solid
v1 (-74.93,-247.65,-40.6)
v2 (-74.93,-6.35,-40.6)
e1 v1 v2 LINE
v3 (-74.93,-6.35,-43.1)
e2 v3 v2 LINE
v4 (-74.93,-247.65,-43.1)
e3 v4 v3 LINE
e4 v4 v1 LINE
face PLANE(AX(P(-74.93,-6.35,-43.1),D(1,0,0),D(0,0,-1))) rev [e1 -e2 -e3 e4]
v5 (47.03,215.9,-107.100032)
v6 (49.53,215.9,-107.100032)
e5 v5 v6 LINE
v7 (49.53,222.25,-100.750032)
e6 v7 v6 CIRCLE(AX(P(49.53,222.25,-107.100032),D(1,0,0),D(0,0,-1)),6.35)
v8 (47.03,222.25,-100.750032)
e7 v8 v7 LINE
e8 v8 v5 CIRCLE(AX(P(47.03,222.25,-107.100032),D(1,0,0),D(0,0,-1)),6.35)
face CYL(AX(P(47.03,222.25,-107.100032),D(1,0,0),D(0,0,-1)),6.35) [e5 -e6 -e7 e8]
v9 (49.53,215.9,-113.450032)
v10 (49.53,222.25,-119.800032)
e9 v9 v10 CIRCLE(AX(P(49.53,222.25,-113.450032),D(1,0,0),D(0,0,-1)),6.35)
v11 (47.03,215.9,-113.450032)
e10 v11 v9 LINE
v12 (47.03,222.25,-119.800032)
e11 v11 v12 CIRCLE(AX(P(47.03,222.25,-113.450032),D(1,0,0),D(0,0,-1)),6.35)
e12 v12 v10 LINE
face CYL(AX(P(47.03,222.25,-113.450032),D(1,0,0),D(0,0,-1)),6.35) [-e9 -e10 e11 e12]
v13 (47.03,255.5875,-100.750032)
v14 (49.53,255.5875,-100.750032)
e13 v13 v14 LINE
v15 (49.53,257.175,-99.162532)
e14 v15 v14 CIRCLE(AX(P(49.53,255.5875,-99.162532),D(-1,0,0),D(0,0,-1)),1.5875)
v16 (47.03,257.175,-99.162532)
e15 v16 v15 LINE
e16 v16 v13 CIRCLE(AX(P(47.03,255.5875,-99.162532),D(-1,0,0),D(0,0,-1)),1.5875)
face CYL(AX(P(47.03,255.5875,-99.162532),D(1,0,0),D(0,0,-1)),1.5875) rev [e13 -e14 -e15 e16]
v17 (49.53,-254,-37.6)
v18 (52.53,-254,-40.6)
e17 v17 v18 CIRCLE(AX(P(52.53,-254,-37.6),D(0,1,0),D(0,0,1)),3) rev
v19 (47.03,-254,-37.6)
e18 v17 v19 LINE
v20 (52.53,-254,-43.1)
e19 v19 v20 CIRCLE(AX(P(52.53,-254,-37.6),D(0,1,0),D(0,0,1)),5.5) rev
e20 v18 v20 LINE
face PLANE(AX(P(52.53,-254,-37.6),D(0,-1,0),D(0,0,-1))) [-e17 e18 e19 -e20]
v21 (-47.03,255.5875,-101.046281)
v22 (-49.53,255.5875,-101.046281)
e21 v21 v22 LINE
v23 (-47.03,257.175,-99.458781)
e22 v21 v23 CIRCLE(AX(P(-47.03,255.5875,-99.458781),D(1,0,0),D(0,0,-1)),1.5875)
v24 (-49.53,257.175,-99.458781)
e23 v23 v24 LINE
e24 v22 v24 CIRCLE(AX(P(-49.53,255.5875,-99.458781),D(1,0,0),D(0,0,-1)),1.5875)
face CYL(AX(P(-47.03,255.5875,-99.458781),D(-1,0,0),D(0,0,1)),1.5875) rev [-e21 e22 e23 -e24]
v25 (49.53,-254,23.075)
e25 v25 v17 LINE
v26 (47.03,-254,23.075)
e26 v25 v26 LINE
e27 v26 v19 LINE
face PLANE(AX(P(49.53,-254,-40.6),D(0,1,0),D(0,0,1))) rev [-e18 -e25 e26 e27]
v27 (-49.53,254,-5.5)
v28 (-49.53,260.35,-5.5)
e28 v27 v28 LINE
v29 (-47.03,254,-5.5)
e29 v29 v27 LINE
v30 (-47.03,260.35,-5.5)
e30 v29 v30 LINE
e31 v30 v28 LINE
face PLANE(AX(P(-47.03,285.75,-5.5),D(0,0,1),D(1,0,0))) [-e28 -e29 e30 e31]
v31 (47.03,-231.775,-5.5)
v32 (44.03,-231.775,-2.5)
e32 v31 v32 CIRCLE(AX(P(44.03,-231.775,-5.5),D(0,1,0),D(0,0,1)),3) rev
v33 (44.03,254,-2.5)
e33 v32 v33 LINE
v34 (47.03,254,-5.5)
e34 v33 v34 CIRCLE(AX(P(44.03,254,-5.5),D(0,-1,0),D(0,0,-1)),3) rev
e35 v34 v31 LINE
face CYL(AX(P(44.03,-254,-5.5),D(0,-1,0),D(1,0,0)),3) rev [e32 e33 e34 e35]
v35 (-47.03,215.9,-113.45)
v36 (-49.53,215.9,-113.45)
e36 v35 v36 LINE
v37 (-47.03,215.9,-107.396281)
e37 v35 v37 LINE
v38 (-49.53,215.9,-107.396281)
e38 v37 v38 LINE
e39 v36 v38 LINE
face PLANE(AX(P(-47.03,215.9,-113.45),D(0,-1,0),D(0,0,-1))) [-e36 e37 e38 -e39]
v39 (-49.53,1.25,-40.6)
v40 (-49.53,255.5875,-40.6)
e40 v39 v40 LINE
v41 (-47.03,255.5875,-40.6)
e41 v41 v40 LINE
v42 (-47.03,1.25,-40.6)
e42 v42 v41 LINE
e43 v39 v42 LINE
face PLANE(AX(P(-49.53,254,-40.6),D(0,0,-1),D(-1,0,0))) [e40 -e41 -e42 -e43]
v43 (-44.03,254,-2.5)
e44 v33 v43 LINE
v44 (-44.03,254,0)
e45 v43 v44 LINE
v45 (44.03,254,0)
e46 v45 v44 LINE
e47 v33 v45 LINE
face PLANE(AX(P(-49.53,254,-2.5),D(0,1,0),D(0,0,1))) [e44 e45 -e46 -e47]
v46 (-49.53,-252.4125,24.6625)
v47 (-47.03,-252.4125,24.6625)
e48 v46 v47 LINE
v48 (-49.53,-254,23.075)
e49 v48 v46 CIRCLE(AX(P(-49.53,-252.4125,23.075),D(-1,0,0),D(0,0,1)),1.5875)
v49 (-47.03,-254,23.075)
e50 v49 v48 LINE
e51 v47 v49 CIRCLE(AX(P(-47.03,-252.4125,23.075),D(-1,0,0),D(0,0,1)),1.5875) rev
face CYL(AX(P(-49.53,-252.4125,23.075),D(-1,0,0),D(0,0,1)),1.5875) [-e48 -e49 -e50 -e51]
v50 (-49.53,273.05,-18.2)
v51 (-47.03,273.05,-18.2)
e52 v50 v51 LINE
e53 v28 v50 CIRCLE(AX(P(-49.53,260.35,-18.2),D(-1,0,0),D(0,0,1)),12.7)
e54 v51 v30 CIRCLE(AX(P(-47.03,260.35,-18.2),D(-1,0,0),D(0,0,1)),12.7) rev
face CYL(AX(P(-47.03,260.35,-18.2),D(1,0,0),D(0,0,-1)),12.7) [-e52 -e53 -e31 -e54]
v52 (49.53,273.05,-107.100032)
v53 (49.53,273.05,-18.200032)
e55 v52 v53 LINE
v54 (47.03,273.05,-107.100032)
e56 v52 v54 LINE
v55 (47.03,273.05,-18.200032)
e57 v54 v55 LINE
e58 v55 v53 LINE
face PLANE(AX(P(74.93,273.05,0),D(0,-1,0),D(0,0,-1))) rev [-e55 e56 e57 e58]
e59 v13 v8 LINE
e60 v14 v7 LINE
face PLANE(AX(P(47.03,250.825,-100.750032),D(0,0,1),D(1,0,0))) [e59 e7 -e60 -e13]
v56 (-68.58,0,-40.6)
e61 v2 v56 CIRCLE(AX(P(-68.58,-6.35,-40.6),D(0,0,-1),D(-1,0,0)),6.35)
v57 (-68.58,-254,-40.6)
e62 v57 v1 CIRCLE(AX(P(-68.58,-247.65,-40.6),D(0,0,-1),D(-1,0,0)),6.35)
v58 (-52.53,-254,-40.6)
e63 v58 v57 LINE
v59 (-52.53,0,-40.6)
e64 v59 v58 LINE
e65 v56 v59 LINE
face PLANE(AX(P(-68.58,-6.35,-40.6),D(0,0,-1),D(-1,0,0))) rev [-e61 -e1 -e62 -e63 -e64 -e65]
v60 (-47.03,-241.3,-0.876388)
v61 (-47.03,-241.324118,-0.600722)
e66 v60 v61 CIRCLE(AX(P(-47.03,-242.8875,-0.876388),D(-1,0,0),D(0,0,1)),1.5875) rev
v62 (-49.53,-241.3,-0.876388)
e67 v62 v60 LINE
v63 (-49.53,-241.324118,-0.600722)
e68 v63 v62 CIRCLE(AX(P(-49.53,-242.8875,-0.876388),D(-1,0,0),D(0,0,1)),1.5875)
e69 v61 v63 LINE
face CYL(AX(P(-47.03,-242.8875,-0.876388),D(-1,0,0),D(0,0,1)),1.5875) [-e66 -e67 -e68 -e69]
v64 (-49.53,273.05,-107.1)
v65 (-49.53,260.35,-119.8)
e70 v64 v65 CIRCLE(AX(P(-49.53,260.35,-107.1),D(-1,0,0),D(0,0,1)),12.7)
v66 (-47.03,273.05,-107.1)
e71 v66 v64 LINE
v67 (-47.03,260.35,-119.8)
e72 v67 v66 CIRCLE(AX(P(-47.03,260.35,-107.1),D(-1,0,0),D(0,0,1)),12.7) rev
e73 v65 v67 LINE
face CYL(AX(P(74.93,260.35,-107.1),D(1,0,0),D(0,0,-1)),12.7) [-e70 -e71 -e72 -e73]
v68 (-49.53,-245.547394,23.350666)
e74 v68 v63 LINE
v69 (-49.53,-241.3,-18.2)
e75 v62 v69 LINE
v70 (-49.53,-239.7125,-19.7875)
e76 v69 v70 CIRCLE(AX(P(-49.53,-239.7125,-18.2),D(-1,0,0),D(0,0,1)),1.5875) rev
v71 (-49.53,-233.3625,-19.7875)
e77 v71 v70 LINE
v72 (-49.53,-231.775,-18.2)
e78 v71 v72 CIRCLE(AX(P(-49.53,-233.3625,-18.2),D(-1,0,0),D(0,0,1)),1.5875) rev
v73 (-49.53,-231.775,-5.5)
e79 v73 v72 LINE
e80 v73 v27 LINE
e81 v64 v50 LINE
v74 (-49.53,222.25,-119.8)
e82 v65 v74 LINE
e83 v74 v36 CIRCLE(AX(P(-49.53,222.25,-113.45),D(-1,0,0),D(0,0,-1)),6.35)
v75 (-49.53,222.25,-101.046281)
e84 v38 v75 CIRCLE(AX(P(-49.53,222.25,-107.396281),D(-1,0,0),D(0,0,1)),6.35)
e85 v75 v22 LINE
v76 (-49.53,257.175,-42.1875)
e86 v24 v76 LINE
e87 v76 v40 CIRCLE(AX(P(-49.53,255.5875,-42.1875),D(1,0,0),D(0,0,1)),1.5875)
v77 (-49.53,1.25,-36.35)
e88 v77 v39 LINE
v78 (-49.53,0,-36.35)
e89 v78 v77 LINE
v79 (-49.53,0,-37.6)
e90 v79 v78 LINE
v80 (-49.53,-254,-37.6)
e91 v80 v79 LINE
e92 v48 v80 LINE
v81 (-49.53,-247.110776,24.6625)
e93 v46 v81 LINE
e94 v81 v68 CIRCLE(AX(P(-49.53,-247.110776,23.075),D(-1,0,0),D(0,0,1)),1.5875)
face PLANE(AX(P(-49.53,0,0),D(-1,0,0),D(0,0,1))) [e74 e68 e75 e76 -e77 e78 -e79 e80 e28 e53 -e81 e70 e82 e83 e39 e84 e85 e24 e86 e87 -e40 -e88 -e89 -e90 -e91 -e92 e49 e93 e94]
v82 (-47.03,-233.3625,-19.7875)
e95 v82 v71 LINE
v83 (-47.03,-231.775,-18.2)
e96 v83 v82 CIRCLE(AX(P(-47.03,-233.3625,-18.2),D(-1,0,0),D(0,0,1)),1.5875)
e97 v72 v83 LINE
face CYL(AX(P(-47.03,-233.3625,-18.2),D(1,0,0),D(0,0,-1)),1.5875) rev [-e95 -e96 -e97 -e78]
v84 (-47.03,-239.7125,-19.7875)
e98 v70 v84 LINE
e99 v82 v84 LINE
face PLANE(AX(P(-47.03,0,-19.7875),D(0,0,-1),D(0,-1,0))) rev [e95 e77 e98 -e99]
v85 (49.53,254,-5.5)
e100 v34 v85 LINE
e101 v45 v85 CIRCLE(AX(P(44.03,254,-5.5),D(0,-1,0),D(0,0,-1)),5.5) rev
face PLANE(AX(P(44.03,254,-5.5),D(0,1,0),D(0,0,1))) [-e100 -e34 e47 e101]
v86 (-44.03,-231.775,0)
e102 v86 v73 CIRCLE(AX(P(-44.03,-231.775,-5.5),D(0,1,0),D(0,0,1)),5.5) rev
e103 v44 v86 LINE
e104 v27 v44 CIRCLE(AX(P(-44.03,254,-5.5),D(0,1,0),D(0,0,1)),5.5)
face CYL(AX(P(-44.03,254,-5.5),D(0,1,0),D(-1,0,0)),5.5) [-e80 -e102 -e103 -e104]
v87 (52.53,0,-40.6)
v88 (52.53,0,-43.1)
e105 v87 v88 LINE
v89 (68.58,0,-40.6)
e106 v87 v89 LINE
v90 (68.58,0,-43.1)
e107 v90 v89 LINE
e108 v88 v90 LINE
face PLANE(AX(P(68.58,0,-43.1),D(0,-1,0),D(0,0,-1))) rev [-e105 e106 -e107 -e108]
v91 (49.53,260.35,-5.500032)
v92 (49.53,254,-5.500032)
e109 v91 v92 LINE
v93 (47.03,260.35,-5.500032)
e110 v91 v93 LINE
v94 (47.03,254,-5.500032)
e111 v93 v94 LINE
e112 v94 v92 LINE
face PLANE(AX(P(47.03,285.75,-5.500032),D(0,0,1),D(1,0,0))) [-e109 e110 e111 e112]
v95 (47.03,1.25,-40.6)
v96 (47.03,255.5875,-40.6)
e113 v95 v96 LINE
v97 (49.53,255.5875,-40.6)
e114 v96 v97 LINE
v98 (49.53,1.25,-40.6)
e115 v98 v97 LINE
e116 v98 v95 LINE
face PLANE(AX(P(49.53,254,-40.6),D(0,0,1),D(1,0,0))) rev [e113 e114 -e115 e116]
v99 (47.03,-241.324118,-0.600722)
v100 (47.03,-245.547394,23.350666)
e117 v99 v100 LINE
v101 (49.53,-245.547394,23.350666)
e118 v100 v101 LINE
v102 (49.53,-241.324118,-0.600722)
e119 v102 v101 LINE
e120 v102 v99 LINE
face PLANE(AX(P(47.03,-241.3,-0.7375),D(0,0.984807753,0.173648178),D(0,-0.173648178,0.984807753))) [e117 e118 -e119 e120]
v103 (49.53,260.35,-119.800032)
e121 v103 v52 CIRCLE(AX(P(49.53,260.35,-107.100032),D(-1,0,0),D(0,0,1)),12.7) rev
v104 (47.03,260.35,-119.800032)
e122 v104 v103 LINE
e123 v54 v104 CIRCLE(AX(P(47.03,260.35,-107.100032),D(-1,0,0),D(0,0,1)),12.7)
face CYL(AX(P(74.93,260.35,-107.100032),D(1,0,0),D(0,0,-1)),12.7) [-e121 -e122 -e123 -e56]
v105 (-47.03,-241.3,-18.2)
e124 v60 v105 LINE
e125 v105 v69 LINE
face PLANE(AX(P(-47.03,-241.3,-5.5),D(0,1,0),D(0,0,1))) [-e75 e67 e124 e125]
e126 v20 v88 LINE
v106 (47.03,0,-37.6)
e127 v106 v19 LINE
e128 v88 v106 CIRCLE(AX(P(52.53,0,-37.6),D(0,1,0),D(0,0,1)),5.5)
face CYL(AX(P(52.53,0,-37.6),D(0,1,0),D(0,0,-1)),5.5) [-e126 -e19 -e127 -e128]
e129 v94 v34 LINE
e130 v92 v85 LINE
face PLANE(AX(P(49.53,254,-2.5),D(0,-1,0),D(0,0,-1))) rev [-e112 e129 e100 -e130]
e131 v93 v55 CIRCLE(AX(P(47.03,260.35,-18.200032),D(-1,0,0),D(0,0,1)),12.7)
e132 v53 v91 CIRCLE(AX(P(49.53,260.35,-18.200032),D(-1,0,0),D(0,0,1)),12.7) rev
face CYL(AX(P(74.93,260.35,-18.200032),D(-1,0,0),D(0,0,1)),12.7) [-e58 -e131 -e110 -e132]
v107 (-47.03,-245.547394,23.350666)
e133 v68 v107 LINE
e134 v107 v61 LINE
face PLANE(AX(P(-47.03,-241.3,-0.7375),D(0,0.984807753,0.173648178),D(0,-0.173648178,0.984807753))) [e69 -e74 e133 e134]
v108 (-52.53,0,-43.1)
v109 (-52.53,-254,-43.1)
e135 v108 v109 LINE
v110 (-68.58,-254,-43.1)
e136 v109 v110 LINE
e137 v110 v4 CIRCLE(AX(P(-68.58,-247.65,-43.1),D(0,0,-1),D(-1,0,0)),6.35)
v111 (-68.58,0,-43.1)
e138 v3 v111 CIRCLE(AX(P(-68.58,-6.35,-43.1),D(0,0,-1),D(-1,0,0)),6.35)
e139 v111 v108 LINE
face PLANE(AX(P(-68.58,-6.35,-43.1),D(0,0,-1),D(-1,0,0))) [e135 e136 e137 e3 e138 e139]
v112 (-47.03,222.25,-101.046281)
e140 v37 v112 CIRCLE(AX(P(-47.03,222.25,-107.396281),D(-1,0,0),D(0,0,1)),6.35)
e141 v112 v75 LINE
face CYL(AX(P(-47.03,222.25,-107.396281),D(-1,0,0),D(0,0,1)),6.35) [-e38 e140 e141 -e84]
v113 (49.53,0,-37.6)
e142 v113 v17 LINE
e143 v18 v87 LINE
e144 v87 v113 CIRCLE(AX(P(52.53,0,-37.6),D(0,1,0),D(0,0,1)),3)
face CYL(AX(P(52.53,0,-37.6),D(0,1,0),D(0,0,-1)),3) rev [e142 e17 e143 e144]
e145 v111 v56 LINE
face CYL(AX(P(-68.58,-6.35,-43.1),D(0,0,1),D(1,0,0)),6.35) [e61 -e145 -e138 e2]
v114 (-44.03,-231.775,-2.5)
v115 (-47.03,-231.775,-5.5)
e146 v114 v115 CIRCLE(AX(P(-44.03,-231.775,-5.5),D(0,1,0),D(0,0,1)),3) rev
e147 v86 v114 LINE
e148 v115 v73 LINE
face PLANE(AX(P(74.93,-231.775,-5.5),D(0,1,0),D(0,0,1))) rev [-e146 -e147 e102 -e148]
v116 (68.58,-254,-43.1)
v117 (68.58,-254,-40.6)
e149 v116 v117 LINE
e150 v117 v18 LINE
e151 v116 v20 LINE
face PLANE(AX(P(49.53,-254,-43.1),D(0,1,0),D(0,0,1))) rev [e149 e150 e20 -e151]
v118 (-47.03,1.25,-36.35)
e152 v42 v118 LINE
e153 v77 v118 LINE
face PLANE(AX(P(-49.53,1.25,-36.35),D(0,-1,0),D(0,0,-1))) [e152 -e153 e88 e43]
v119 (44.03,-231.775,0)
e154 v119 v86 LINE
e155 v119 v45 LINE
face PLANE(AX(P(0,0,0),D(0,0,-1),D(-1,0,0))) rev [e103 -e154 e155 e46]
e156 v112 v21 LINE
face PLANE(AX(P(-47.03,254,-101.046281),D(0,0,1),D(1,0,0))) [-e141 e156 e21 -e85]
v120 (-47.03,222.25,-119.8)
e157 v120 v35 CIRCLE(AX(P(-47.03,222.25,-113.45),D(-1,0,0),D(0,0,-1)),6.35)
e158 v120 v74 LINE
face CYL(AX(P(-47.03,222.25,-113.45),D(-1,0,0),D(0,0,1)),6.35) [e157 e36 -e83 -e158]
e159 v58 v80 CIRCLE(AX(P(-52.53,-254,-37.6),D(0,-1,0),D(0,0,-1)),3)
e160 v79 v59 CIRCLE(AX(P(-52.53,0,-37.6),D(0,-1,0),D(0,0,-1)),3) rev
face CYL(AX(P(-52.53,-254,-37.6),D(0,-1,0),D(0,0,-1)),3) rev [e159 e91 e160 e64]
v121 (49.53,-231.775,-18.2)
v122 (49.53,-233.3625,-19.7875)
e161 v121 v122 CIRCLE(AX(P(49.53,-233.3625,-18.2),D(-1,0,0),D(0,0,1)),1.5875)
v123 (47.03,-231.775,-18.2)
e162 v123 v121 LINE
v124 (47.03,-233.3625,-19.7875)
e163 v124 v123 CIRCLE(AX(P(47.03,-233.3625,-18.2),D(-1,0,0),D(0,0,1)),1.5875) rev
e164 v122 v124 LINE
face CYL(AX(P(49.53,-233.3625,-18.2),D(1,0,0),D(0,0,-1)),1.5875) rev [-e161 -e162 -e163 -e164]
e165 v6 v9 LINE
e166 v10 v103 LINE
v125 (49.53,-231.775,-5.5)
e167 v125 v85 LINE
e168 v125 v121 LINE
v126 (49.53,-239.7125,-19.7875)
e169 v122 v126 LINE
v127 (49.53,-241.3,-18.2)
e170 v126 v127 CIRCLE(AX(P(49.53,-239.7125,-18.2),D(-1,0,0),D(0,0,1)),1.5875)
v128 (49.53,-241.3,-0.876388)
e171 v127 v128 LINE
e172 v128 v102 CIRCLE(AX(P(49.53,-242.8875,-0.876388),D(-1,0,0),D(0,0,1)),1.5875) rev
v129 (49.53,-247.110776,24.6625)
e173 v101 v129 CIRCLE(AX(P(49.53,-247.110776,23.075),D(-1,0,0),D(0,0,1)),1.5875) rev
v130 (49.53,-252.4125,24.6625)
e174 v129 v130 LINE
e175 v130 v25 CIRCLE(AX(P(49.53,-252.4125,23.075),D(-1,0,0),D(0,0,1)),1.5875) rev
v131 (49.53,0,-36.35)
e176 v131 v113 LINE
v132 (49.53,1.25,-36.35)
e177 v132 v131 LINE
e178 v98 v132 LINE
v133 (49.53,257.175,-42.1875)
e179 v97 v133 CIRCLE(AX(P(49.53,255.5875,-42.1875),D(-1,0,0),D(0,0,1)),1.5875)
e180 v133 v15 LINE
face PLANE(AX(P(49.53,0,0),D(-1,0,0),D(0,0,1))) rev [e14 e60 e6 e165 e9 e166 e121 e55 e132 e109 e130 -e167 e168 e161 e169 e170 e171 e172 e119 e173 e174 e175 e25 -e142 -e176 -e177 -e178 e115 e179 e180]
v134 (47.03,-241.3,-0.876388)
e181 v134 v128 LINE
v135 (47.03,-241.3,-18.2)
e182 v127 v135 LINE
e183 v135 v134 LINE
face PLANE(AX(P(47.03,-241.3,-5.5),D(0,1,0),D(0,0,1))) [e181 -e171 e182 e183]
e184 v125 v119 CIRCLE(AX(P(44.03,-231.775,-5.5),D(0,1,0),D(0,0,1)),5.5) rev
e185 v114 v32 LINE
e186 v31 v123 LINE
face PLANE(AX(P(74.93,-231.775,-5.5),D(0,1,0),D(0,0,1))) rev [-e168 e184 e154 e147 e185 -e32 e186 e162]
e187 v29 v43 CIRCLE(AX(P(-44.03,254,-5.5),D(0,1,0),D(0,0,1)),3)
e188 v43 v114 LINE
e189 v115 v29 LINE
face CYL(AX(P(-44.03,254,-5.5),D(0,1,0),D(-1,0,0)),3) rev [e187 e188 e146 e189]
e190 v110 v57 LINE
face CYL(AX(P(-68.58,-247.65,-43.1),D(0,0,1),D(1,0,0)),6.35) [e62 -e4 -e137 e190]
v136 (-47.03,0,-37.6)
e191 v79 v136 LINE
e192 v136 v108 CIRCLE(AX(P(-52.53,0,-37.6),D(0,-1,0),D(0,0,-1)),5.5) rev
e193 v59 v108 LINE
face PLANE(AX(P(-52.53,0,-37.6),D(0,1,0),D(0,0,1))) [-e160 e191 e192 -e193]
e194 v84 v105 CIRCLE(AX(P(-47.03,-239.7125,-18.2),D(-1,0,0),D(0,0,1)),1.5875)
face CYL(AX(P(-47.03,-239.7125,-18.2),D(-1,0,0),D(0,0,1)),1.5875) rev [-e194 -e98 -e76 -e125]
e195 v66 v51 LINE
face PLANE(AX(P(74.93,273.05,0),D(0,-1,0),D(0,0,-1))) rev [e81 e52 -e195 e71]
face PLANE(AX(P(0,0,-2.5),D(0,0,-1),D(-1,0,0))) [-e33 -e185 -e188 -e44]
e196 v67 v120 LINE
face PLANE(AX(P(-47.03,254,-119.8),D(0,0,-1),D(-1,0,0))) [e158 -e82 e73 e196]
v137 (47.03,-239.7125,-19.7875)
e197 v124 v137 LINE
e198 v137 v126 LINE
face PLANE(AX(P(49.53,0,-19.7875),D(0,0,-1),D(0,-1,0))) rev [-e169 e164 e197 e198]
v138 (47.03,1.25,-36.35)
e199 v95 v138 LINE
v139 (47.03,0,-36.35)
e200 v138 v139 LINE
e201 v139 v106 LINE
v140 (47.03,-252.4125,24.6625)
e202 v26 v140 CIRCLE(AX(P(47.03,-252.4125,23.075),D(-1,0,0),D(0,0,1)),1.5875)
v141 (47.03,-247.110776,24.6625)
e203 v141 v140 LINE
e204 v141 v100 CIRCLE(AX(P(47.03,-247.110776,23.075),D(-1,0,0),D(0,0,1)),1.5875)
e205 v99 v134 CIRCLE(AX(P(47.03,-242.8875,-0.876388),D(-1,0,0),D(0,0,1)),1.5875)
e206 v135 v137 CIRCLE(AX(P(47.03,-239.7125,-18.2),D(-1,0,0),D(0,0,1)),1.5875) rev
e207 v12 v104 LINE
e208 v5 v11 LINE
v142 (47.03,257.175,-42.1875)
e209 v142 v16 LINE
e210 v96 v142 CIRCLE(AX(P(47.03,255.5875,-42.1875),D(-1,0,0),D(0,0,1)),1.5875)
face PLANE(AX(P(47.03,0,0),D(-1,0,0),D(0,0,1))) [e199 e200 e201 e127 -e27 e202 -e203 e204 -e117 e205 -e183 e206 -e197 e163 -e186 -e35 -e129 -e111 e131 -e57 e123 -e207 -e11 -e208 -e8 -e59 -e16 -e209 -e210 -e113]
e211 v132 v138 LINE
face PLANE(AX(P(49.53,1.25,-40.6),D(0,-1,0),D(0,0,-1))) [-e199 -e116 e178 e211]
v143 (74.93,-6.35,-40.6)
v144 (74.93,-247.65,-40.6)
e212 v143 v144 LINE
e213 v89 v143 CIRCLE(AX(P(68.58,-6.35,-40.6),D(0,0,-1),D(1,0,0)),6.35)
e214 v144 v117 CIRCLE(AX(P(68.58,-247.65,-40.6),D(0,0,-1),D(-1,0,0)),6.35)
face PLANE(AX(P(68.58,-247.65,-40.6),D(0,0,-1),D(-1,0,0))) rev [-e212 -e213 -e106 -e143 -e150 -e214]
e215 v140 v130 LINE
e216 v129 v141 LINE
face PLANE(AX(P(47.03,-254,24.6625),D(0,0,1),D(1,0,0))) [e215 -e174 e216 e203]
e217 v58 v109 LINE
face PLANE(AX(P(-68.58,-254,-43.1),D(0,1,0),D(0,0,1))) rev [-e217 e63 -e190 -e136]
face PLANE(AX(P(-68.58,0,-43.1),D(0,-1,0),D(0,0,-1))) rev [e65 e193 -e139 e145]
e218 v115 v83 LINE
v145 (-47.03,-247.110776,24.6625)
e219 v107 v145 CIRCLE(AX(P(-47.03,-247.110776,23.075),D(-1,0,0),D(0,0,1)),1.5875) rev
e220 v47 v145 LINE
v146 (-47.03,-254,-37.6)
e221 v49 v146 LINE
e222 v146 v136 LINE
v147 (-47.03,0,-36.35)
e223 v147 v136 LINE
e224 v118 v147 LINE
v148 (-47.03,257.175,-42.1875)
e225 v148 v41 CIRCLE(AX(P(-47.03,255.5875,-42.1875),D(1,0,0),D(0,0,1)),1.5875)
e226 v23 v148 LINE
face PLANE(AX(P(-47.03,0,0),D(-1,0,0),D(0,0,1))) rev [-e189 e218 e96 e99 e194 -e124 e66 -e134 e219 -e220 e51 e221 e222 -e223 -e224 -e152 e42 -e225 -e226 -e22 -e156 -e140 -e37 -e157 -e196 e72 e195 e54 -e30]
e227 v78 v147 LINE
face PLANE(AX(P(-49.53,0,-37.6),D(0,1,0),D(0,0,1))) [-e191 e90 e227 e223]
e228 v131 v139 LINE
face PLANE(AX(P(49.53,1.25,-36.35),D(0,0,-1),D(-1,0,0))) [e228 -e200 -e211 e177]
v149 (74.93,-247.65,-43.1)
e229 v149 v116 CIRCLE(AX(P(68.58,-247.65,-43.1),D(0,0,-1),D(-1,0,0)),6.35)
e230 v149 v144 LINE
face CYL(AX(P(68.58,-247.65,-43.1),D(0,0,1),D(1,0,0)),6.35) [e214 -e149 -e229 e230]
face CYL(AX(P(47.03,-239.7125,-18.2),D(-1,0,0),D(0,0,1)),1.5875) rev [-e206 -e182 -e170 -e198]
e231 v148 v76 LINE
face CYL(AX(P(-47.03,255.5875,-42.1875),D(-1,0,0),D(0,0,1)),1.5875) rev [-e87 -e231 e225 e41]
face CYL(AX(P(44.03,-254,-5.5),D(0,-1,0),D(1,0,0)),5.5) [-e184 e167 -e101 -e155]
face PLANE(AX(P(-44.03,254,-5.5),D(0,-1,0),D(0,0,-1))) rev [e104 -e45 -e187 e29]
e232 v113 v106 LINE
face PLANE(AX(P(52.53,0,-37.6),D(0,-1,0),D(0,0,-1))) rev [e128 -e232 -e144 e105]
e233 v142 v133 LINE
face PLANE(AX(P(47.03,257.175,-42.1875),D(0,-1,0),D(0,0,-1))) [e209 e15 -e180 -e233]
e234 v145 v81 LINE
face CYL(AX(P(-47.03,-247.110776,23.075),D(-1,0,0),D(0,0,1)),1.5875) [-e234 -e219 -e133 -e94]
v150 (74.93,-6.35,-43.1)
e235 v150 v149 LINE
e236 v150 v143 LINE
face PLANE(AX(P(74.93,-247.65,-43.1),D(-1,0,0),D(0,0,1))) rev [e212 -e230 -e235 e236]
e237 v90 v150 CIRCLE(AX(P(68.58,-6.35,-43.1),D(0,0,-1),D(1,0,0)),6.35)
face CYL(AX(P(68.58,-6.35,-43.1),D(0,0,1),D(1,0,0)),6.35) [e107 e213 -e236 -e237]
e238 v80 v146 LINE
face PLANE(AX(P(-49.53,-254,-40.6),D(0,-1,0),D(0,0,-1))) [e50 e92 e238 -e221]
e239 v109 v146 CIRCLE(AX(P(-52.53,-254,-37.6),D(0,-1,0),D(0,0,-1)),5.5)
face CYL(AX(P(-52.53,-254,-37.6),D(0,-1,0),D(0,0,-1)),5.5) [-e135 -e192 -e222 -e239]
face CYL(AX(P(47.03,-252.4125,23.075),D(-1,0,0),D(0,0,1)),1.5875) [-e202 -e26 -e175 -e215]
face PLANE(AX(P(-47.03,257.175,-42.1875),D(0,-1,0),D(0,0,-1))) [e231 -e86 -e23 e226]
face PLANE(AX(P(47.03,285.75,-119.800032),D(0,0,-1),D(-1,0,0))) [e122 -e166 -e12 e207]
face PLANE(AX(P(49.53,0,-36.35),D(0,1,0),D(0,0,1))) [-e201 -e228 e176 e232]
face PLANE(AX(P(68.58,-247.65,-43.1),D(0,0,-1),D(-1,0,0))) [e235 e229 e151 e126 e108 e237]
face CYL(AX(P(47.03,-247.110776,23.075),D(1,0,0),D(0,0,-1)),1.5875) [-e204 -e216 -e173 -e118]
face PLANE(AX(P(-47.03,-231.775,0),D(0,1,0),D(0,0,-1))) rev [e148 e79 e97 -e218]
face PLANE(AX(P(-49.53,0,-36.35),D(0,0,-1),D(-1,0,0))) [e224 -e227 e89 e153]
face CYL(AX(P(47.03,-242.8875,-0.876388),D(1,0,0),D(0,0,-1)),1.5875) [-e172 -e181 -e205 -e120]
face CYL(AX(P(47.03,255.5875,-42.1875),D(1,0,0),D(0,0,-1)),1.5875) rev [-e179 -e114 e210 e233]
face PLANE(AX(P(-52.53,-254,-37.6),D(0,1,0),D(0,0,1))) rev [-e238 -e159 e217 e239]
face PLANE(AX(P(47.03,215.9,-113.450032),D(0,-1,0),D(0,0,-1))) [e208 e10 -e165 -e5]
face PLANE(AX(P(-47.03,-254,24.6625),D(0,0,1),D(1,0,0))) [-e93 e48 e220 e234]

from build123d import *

# Parameters (mm, degrees)
SKETCH1_W                     = 99.06
SKETCH1_H                     = 508
BASE_FLANGE1_DEPTH            = 2.5
EDGE_FLANGE1_STRIP_W          = 16
EDGE_FLANGE1_STRIP_H          = 2.5
EDGE_FLANGE1_STRIP_CUT_DEPTH  = 508
EDGE_FLANGE1_DEPTH            = 508
EDGE_FLANGE2_STRIP_W          = 16
EDGE_FLANGE2_STRIP_H          = 2.5
EDGE_FLANGE2_STRIP_CUT_DEPTH  = 254
EDGE_FLANGE2_RELIEF_W         = 17.25
EDGE_FLANGE2_RELIEF_H         = 1.25
EDGE_FLANGE2_RELIEF_CUT_DEPTH = 2.5
EDGE_FLANGE2_DEPTH            = 254
EDGE_FLANGE2_START            = 2.5
EDGE_FLANGE2_FLAT_DEPTH       = 2.5
EDGE_FLANGE3_STRIP_W          = 16
EDGE_FLANGE3_STRIP_H          = 2.5
EDGE_FLANGE3_STRIP_CUT_DEPTH  = 508
EDGE_FLANGE3_DEPTH            = 508
EDGE_FLANGE4_STRIP_W          = 16
EDGE_FLANGE4_STRIP_H          = 2.5
EDGE_FLANGE4_STRIP_CUT_DEPTH  = 254
EDGE_FLANGE4_RELIEF_W         = 17.25
EDGE_FLANGE4_RELIEF_H         = 1.25
EDGE_FLANGE4_RELIEF_CUT_DEPTH = 2.5
EDGE_FLANGE4_DEPTH            = 254
EDGE_FLANGE4_START            = 2.5
EDGE_FLANGE4_FLAT_DEPTH       = 2.5
SKETCH22_W                    = 5.5
SKETCH22_H                    = 22.225
CUT_EXTRUDE5_DEPTH            = 287.118684465
TAB1_DEPTH                    = 2.5
TAB2_START                    = -2.5
TAB2_DEPTH                    = 2.5
TAB3_DEPTH                    = 2.5
TAB4_START                    = -2.5
TAB4_DEPTH                    = 2.5
SKETCH47_W                    = 14.2875
SKETCH47_H                    = 9.525
CUT_EXTRUDE6_DEPTH            = 337.63035334
FILLET2_R                     = 1.5875
FILLET3_R                     = 1.5875
SKETCH48_W                    = 2.54
SKETCH48_H                    = 15.875
CUT_EXTRUDE9_DEPTH            = 337.63035334
FILLET4_R                     = 12.7


# Read off the part's stored shape, not the designer's step: Tab2
# Sheet-metal steps are written as plain solids
with BuildPart() as part:
    # Sketch1 → Base-Flange1 (new body)
    with BuildSketch(Plane.XY):
        Rectangle(SKETCH1_W, SKETCH1_H)
    extrude(amount=-BASE_FLANGE1_DEPTH)

    # Edge-Flange1 strip (across the edge) → Edge-Flange1 strip cut (cut)
    with BuildSketch(Plane(origin=(-49.53, -254, -2.5), x_dir=(1, 0, 0), z_dir=(0, 1, 0))):
        with Locations((-2.5, -1.25)):
            Rectangle(EDGE_FLANGE1_STRIP_W, EDGE_FLANGE1_STRIP_H)
    extrude(amount=EDGE_FLANGE1_STRIP_CUT_DEPTH, mode=Mode.SUBTRACT)

    # Edge-Flange1 section (across the edge) → Edge-Flange1 (add)
    with BuildSketch(Plane(origin=(-49.53, -254, -2.5), x_dir=(1, 0, 0), z_dir=(0, 1, 0))):
        with BuildLine():
            Line((0, 3), (0, 38.1))
            Line((0, 38.1), (2.5, 38.1))
            Line((2.5, 38.1), (2.5, 3))
            ThreePointArc((2.5, 3), (3.378679656, 0.878679656), (5.5, 0))
            Line((5.5, 0), (5.5, -2.5))
            ThreePointArc((5.5, -2.5), (1.610912703, -0.889087297), (0, 3))
        make_face()
    extrude(amount=EDGE_FLANGE1_DEPTH)

    # Edge-Flange2 strip (across the edge) → Edge-Flange2 strip cut (cut)
    with BuildSketch(Plane(origin=(-49.53, 0, -40.6), x_dir=(0, 0, 1), z_dir=(0, -1, 0))):
        with Locations((-5, -1.25)):
            Rectangle(EDGE_FLANGE2_STRIP_W, EDGE_FLANGE2_STRIP_H)
    extrude(amount=EDGE_FLANGE2_STRIP_CUT_DEPTH, mode=Mode.SUBTRACT)

    # Edge-Flange2 relief (on the sheet) → Edge-Flange2 relief cut (cut)
    with BuildSketch(Plane(origin=(-49.53, 0, -37.6), x_dir=(0, 0, 1), z_dir=(-1, 0, 0))):
        with Locations((-7.375, 0.625)):
            Rectangle(EDGE_FLANGE2_RELIEF_W, EDGE_FLANGE2_RELIEF_H)
    extrude(amount=-EDGE_FLANGE2_RELIEF_CUT_DEPTH, mode=Mode.SUBTRACT)

    # Edge-Flange2 bend section (across the edge) → Edge-Flange2 (add)
    with BuildSketch(Plane(origin=(-49.53, 0, -40.6), x_dir=(0, 0, 1), z_dir=(0, -1, 0))):
        with BuildLine():
            Line((-2.5, 3), (0, 3))
            ThreePointArc((0, 3), (0.878679656, 0.878679656), (3, 0))
            Line((3, 0), (3, -2.5))
            ThreePointArc((3, -2.5), (-0.889087297, -0.889087297), (-2.5, 3))
        make_face()
    extrude(amount=EDGE_FLANGE2_DEPTH)

    # Edge-Flange2 profile (on flange) → Edge-Flange2 flat (add)
    with BuildSketch(Plane(origin=(-49.53, 0, -40.6), x_dir=(0, -1, 0), z_dir=(0, 0, -1)).offset(EDGE_FLANGE2_START)):
        with BuildLine():
            Line((254, 3), (254, 19.05))
            ThreePointArc((254, 19.05), (252.140128061, 23.540128061), (247.65, 25.4))
            Line((247.65, 25.4), (6.35, 25.4))
            ThreePointArc((6.35, 25.4), (1.859871939, 23.540128061), (0, 19.05))
            Line((0, 19.05), (0, 3))
            Line((0, 3), (254, 3))
        make_face()
    extrude(amount=-EDGE_FLANGE2_FLAT_DEPTH)

    # Edge-Flange3 strip (across the edge) → Edge-Flange3 strip cut (cut)
    with BuildSketch(Plane(origin=(49.53, 254, -2.5), x_dir=(-1, 0, 0), z_dir=(0, -1, 0))):
        with Locations((-2.5, -1.25)):
            Rectangle(EDGE_FLANGE3_STRIP_W, EDGE_FLANGE3_STRIP_H)
    extrude(amount=EDGE_FLANGE3_STRIP_CUT_DEPTH, mode=Mode.SUBTRACT)

    # Edge-Flange3 section (across the edge) → Edge-Flange3 (add)
    with BuildSketch(Plane(origin=(49.53, 254, -2.5), x_dir=(-1, 0, 0), z_dir=(0, -1, 0))):
        with BuildLine():
            Line((0, 3), (0, 38.1))
            Line((0, 38.1), (2.5, 38.1))
            Line((2.5, 38.1), (2.5, 3))
            ThreePointArc((2.5, 3), (3.378679656, 0.878679656), (5.5, 0))
            Line((5.5, 0), (5.5, -2.5))
            ThreePointArc((5.5, -2.5), (1.610912703, -0.889087297), (0, 3))
        make_face()
    extrude(amount=EDGE_FLANGE3_DEPTH)

    # Edge-Flange4 strip (across the edge) → Edge-Flange4 strip cut (cut)
    with BuildSketch(Plane(origin=(49.53, -254, -40.6), x_dir=(0, 0, 1), z_dir=(0, 1, 0))):
        with Locations((-5, -1.25)):
            Rectangle(EDGE_FLANGE4_STRIP_W, EDGE_FLANGE4_STRIP_H)
    extrude(amount=EDGE_FLANGE4_STRIP_CUT_DEPTH, mode=Mode.SUBTRACT)

    # Edge-Flange4 relief (on the sheet) → Edge-Flange4 relief cut (cut)
    with BuildSketch(Plane(origin=(49.53, -254, -37.6), x_dir=(0, 0, 1), z_dir=(1, 0, 0))):
        with Locations((-7.375, -254.625)):
            Rectangle(EDGE_FLANGE4_RELIEF_W, EDGE_FLANGE4_RELIEF_H)
    extrude(amount=-EDGE_FLANGE4_RELIEF_CUT_DEPTH, mode=Mode.SUBTRACT)

    # Edge-Flange4 bend section (across the edge) → Edge-Flange4 (add)
    with BuildSketch(Plane(origin=(49.53, -254, -40.6), x_dir=(0, 0, 1), z_dir=(0, 1, 0))):
        with BuildLine():
            Line((-2.5, 3), (0, 3))
            ThreePointArc((0, 3), (0.878679656, 0.878679656), (3, 0))
            Line((3, 0), (3, -2.5))
            ThreePointArc((3, -2.5), (-0.889087297, -0.889087297), (-2.5, 3))
        make_face()
    extrude(amount=EDGE_FLANGE4_DEPTH)

    # Edge-Flange4 profile (on flange) → Edge-Flange4 flat (add)
    with BuildSketch(Plane(origin=(49.53, 0, -40.6), x_dir=(0, 1, 0), z_dir=(0, 0, -1)).offset(EDGE_FLANGE4_START)):
        with BuildLine():
            Line((-254, 19.05), (-254, 3))
            Line((-254, 3), (0, 3))
            Line((0, 3), (0, 19.05))
            ThreePointArc((0, 19.05), (-1.859871939, 23.540128061), (-6.35, 25.4))
            Line((-6.35, 25.4), (-247.65, 25.4))
            ThreePointArc((-247.65, 25.4), (-252.140128061, 23.540128061), (-254, 19.05))
        make_face()
    extrude(amount=-EDGE_FLANGE4_FLAT_DEPTH)

    # Sketch22 → Cut-Extrude5 (cut, through all)
    with BuildSketch(Plane.ZY.offset(49.53)):
        with Locations((-2.75, -242.8875)):
            Rectangle(SKETCH22_W, SKETCH22_H)
    extrude(amount=-CUT_EXTRUDE5_DEPTH, mode=Mode.SUBTRACT)

    # Sketch30 → Tab1 (add)
    with BuildSketch(Plane.ZY.offset(49.53)):
        Polygon((-5.5, -254), (24.6625, -254), (24.6625, -245.77870531), (-0.7375, -241.3), (-5.5, -241.3), align=None)
    extrude(amount=-TAB1_DEPTH)

    # Tab2 outline → Tab2 (add)
    with BuildSketch(Plane(origin=(49.53, 0, 0), x_dir=(0, 0, -1), z_dir=(1, 0, 0)).offset(TAB2_START)):
        Polygon((-24.6625, -254), (5.5, -254), (5.5, -241.3), (0.7375, -241.3), (-24.6625, -245.77870531), align=None)
    extrude(amount=TAB2_DEPTH)

    # Sketch43 → Tab3 (add)
    with BuildSketch(Plane(origin=(49.53, 0, 0), x_dir=(0, 0, -1), z_dir=(1, 0, 0))):
        with BuildLine():
            Line((8.675031572, 288.925), (116.625031572, 288.925))
            ThreePointArc((116.625031572, 288.925), (118.870095602, 287.99506403), (119.800031572, 285.75))
            Line((119.800031572, 285.75), (119.800031572, 254))
            Line((119.800031572, 254), (119.800031572, 222.25))
            ThreePointArc((119.800031572, 222.25), (117.940159632, 217.759871939), (113.450031572, 215.9))
            Line((113.450031572, 215.9), (107.100031572, 215.9))
            ThreePointArc((107.100031572, 215.9), (102.609903511, 217.759871939), (100.750031572, 222.25))
            Line((100.750031572, 222.25), (100.750031572, 250.825))
            Line((100.750031572, 250.825), (100.750031572, 254))
            Line((100.750031572, 254), (100.750031572, 255.5875))
            ThreePointArc((100.750031572, 255.5875), (100.285063587, 256.710032015), (99.162531572, 257.175))
            Line((99.162531572, 257.175), (42.1875, 257.175))
            ThreePointArc((42.1875, 257.175), (41.064967985, 256.710032015), (40.6, 255.5875))
            Line((40.6, 255.5875), (40.6, 254))
            Line((40.6, 254), (5.500031572, 254))
            Line((5.500031572, 254), (5.500031572, 285.75))
            ThreePointArc((5.500031572, 285.75), (6.429967542, 287.99506403), (8.675031572, 288.925))
        make_face()
    extrude(amount=-TAB3_DEPTH)

    # Sketch46 → Tab4 (add)
    with BuildSketch(Plane.ZY.offset(49.53).offset(TAB4_START)):
        with BuildLine():
            Line((-116.625, 288.925), (-8.675, 288.925))
            ThreePointArc((-8.675, 288.925), (-6.42993597, 287.99506403), (-5.5, 285.75))
            Line((-5.5, 285.75), (-5.5, 254))
            Line((-5.5, 254), (-40.6, 254))
            Line((-40.6, 254), (-40.6, 255.5875))
            ThreePointArc((-40.6, 255.5875), (-41.064967985, 256.710032015), (-42.1875, 257.175))
            Line((-42.1875, 257.175), (-99.458781194, 257.175))
            ThreePointArc((-99.458781194, 257.175), (-100.581313209, 256.710032015), (-101.046281194, 255.5875))
            Line((-101.046281194, 255.5875), (-101.046281194, 254))
            Line((-101.046281194, 254), (-101.046281194, 222.25))
            ThreePointArc((-101.046281194, 222.25), (-102.906153133, 217.759871939), (-107.396281194, 215.9))
            Line((-107.396281194, 215.9), (-113.45, 215.9))
            ThreePointArc((-113.45, 215.9), (-117.940128061, 217.759871939), (-119.8, 222.25))
            Line((-119.8, 222.25), (-119.8, 254))
            Line((-119.8, 254), (-119.8, 285.75))
            ThreePointArc((-119.8, 285.75), (-118.87006403, 287.99506403), (-116.625, 288.925))
        make_face()
    extrude(amount=TAB4_DEPTH)

    # Sketch47 → Cut-Extrude6 (cut, through all)
    with BuildSketch(Plane.ZY.offset(49.53)):
        with Locations((-12.64375, -236.5375)):
            Rectangle(SKETCH47_W, SKETCH47_H)
    extrude(amount=-CUT_EXTRUDE6_DEPTH, mode=Mode.SUBTRACT)

    # Fillet2
    fillet2_edges = [part.edges().sort_by_distance(p)[0] for p in [
        (48.28, -231.775, -19.7875),
        (48.28, -241.3, -19.7875),
        (-48.28, -231.775, -19.7875),
        (-48.28, -241.3, -19.7875),
    ]]
    fillet(fillet2_edges, radius=FILLET2_R)

    # Fillet3
    fillet3_edges = [part.edges().sort_by_distance(p)[0] for p in [
        (-48.28, -241.3, -0.7375),
        (-48.28, -245.77870531, 24.6625),
        (-48.28, -254, 24.6625),
        (48.28, -254, 24.6625),
        (48.28, -245.77870531, 24.6625),
        (48.28, -241.3, -0.7375),
    ]]
    fillet(fillet3_edges, radius=FILLET3_R)

    # Sketch48 → Cut-Extrude9 (cut, through all)
    with BuildSketch(Plane.ZY.offset(49.53)):
        with BuildLine():
            Line((-8.675, 288.925), (-116.625, 288.925))
            ThreePointArc((-116.625, 288.925), (-118.87006403, 287.99506403), (-119.8, 285.75))
            Line((-119.8, 285.75), (-119.8, 273.05))
            Line((-119.8, 273.05), (-5.5, 273.05))
            Line((-5.5, 273.05), (-5.5, 285.75))
            ThreePointArc((-5.5, 285.75), (-6.42993597, 287.99506403), (-8.675, 288.925))
        make_face()
        with Locations((-121.07, 280.9875)):
            Rectangle(SKETCH48_W, SKETCH48_H)
    extrude(amount=-CUT_EXTRUDE9_DEPTH, mode=Mode.SUBTRACT)


with BuildPart() as cut_extrude9_kept_piece:
    # of the separate pieces the step leaves, the one the design keeps (cut_extrude9_pieces_kept)
    add(part.part.solids().sort_by_distance((47.03, -241.3, -0.876388253))[0])

    # Fillet4
    fillet4_edges = [cut_extrude9_kept_piece.edges().sort_by_distance(p)[0] for p in [
        (-48.28, 273.05, -119.8),
        (48.28, 273.05, -5.500031572),
        (48.28, 273.05, -119.800031572),
        (-48.28, 273.05, -5.5),
    ]]
    fillet(fillet4_edges, radius=FILLET4_R)


solid = cut_extrude9_kept_piece.part
